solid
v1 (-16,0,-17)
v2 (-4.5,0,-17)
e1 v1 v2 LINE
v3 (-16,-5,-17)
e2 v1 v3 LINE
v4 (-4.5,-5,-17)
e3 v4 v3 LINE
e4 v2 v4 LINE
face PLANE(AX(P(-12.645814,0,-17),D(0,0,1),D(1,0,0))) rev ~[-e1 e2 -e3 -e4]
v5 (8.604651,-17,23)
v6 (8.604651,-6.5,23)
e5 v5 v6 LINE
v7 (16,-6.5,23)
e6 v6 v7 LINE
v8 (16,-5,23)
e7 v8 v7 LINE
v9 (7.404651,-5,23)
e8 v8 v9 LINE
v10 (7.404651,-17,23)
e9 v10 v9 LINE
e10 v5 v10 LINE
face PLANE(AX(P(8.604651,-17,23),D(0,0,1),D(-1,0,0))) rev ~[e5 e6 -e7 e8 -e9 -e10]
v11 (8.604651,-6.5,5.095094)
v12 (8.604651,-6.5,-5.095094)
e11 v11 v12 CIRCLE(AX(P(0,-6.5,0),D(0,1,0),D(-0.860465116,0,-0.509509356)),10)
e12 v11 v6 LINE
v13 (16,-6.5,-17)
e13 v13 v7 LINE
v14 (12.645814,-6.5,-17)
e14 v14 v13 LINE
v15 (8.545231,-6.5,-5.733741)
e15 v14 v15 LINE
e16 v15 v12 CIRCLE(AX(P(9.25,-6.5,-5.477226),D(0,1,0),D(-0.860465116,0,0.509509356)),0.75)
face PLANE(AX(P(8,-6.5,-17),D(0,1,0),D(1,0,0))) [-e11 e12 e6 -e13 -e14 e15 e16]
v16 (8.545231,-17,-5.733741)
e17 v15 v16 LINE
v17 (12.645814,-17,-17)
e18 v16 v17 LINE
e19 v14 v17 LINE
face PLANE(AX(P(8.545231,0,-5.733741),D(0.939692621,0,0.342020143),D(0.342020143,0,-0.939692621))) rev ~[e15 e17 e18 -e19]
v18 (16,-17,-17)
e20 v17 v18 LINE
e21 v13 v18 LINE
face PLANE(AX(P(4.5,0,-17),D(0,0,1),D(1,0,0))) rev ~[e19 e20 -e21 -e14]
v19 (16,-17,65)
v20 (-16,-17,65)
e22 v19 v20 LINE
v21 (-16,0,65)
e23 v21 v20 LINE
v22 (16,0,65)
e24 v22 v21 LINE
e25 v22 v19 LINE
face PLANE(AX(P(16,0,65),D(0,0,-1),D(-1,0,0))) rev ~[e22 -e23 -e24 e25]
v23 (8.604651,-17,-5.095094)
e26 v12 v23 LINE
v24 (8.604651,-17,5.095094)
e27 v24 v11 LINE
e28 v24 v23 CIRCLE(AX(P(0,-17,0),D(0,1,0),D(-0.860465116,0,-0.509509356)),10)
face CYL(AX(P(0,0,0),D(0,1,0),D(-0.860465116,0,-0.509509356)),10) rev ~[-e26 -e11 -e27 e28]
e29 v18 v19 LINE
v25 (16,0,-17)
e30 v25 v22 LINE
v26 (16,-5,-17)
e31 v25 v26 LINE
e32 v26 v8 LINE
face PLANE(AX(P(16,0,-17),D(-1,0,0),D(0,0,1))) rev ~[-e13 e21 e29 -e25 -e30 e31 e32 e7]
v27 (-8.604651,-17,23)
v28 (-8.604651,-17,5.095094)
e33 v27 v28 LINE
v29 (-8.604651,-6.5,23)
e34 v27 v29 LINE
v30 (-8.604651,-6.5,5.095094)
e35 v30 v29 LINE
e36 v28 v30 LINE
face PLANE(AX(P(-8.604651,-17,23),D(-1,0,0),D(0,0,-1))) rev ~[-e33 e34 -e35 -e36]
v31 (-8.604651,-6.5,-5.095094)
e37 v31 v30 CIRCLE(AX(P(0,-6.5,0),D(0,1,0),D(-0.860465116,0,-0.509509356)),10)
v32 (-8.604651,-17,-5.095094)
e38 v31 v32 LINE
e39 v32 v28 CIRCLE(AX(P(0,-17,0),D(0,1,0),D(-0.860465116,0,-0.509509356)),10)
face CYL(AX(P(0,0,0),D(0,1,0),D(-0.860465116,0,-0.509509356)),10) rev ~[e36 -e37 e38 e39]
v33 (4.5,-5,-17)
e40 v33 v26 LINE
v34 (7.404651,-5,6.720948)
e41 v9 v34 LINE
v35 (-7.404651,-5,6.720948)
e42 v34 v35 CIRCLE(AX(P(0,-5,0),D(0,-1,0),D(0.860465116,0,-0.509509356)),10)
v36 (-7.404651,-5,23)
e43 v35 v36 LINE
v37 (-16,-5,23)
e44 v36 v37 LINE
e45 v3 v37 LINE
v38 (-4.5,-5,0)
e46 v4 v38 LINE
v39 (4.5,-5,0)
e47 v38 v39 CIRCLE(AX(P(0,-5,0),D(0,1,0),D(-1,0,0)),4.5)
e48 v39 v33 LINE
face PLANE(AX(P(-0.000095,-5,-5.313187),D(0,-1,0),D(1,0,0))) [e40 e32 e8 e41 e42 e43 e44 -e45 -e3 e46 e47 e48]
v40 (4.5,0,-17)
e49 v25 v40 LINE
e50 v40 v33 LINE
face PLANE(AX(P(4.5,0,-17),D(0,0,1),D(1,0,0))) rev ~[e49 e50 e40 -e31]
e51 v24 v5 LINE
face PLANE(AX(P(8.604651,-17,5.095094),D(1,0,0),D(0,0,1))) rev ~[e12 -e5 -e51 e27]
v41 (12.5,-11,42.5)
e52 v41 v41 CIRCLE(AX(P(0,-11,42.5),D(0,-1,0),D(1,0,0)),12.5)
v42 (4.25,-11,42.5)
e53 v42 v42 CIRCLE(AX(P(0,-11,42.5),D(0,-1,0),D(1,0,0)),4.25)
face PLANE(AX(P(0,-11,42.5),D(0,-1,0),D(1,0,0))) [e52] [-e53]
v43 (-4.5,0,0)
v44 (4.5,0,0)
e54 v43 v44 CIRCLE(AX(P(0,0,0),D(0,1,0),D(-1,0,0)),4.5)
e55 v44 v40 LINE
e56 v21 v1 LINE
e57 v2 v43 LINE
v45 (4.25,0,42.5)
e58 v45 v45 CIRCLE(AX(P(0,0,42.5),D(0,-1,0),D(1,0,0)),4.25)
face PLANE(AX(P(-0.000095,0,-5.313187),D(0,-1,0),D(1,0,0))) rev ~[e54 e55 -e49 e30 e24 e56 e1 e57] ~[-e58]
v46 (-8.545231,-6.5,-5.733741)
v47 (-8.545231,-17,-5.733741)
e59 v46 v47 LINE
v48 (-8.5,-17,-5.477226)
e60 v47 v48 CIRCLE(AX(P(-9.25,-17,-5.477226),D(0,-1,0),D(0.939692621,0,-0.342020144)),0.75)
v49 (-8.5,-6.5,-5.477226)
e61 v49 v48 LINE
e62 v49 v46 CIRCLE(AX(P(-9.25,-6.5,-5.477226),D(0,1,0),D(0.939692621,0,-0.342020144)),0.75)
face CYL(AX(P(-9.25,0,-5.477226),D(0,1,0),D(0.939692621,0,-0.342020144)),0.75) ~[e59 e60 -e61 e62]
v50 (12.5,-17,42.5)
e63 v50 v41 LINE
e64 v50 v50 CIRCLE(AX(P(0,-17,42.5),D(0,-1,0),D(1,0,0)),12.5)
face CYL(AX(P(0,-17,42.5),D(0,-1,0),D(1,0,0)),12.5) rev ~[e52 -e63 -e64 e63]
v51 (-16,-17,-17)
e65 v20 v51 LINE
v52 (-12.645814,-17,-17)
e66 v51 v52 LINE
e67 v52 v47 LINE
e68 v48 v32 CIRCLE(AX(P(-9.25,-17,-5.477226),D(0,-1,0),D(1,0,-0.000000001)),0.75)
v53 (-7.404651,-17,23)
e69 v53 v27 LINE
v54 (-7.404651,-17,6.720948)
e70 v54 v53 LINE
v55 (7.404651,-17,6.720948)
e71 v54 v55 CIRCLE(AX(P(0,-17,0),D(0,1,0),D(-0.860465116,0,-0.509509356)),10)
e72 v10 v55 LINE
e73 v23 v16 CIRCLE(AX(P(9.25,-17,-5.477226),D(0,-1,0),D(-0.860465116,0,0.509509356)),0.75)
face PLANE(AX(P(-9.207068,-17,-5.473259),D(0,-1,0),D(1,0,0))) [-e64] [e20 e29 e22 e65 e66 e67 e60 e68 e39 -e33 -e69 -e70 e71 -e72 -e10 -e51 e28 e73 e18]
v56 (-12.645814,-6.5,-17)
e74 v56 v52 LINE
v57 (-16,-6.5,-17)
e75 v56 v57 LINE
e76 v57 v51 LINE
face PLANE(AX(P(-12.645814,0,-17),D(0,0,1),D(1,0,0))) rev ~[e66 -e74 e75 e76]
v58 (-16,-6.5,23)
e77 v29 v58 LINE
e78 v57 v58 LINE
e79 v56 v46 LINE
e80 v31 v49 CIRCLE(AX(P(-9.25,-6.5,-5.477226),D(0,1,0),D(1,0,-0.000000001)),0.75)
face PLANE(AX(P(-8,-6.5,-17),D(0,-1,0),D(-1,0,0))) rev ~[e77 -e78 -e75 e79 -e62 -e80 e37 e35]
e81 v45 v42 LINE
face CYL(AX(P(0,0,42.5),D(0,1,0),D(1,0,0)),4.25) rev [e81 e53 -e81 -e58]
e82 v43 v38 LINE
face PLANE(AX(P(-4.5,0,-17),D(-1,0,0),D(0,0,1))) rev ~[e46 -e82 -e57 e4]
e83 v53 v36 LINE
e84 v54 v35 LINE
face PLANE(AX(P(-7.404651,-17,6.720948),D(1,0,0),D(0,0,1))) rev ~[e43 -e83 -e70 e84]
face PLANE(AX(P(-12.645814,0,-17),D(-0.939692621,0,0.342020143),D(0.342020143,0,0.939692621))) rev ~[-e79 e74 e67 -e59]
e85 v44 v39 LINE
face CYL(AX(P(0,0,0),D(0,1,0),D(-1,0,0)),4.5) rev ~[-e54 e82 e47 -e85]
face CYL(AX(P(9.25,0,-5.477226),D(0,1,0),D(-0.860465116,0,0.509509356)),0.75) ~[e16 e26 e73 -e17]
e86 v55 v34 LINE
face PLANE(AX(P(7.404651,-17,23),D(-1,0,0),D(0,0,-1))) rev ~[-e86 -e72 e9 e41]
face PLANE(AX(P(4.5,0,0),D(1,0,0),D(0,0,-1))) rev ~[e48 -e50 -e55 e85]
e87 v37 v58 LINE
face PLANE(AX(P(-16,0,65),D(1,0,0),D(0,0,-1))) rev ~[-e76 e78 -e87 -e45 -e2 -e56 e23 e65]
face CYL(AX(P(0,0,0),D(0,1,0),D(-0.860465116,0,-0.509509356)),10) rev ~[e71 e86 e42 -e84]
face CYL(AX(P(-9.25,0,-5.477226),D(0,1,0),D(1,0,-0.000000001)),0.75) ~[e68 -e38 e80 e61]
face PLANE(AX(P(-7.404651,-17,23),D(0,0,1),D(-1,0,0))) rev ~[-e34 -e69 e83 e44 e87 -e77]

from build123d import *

# Parameters (mm, degrees)
F0_R     = 4.25
F1_DEPTH = 17
F2_DEPTH = 5
F4_DEPTH = 12
F5_W     = 4.6458135775
F5_H     = 1.5
F5_W_2   = 3.3541864225
F5_W_3   = 8
F6_DEPTH = 40
F7_R     = 12.5
F7_R_2   = 4.25
F8_DEPTH = 6


# Not quite as in the source:
# - a feature names something its author has since deleted; it is built from what else it names


with BuildPart() as f1:
    # F0 (on Front) → F1 (new body)
    with BuildSketch(Plane.XZ):
        with BuildLine():
            ThreePointArc((-8.5, -5.4772255751), (-8.5266357667, -5.2791241211), (-8.6046511628, -5.0950935582))
            ThreePointArc((-8.6046511628, -5.0950935582), (-9.9967746616, -5.5467065419), (-8.5452305344, -5.7337406825))
            ThreePointArc((-8.5452305344, -5.7337406825), (-8.5113941852, -5.6074617083), (-8.5, -5.4772255751))
        make_face()
        with BuildLine():
            ThreePointArc((-8.6046511628, -5.0950935582), (0, 10), (8.6046511628, -5.0950935582))
            ThreePointArc((8.6046511628, -5.0950935582), (9.4481014539, -4.7538613418), (10, -5.4772255751))
            ThreePointArc((10, -5.4772255751), (9.3802361333, -6.2158313898), (8.5452305344, -5.7337406825))
            Line((8.5452305344, -5.7337406825), (12.6458135775, -17))
            Line((12.6458135775, -17), (16, -17))
            Line((16, -17), (16, 65))
            Line((16, 65), (-16, 65))
            Line((-16, 65), (-16, -17))
            Line((-16, -17), (-12.6458135775, -17))
            Line((-12.6458135775, -17), (-8.5452305344, -5.7337406825))
            ThreePointArc((-8.5452305344, -5.7337406825), (-9.9967746616, -5.5467065419), (-8.6046511628, -5.0950935582))
        make_face()
        with Locations((0, 42.5)):
            Circle(F0_R, mode=Mode.SUBTRACT)
        with BuildLine():
            ThreePointArc((10, -5.4772255751), (9.4481014539, -4.7538613418), (8.6046511628, -5.0950935582))
            ThreePointArc((8.6046511628, -5.0950935582), (8.5032253384, -5.4077446082), (8.5452305344, -5.7337406825))
            ThreePointArc((8.5452305344, -5.7337406825), (9.3802361333, -6.2158313898), (10, -5.4772255751))
        make_face()
    extrude(amount=F1_DEPTH)

    # F0 (on Front) → F2 (join)
    with BuildSketch(Plane.XZ):
        with BuildLine():
            ThreePointArc((8.5452305344, -5.7337406825), (8.5032253384, -5.4077446082), (8.6046511628, -5.0950935582))
            ThreePointArc((8.6046511628, -5.0950935582), (0, 10), (-8.6046511628, -5.0950935582))
            ThreePointArc((-8.6046511628, -5.0950935582), (-8.5266357667, -5.2791241211), (-8.5, -5.4772255751))
            ThreePointArc((-8.5, -5.4772255751), (-8.5113941852, -5.6074617083), (-8.5452305344, -5.7337406825))
            Line((-8.5452305344, -5.7337406825), (-12.6458135775, -17))
            Line((-12.6458135775, -17), (-4.5, -17))
            Line((-4.5, -17), (-4.5, 0))
            ThreePointArc((-4.5, 0), (0, 4.5), (4.5, 0))
            Line((4.5, 0), (4.5, -17))
            Line((4.5, -17), (12.6458135775, -17))
            Line((12.6458135775, -17), (8.5452305344, -5.7337406825))
        make_face()
    extrude(amount=F2_DEPTH)

    # F3 (on face) → F4 (cut)
    with BuildSketch(Plane.XZ.offset(17)):
        with BuildLine():
            Line((-8.6046511628, 23), (-8.6046511628, 5.0950935582))
            ThreePointArc((-8.6046511628, 5.0950935582), (-8.0458244358, 5.938409648), (-7.4046511628, 6.7209479359))
            Line((-7.4046511628, 6.7209479359), (-7.4046511628, 23))
            Line((-7.4046511628, 23), (-8.6046511628, 23))
        make_face()
        with BuildLine():
            Line((7.4046511628, 23), (7.4046511628, 6.7209479359))
            ThreePointArc((7.4046511628, 6.7209479359), (8.0458244358, 5.938409648), (8.6046511628, 5.0950935582))
            Line((8.6046511628, 5.0950935582), (8.6046511628, 23))
            Line((8.6046511628, 23), (7.4046511628, 23))
        make_face()
    extrude(amount=-F4_DEPTH, mode=Mode.SUBTRACT)

    # F5 (on face) → F6 (cut)
    with BuildSketch(Plane(origin=(0, 0, -17), x_dir=(1, 0, 0), z_dir=(0, 0, -1))):
        with Locations((-10.3229067887, 5.75)):
            Rectangle(F5_W, F5_H)
        with Locations((-14.3229067887, 5.75)):
            Rectangle(F5_W_2, F5_H)
        with Locations((12, 5.75)):
            Rectangle(F5_W_3, F5_H)
    extrude(amount=-F6_DEPTH, mode=Mode.SUBTRACT)

    # F7 (on face) → F8 (cut)
    with BuildSketch(Plane.XZ.offset(17)):
        with Locations((0, 42.5)):
            Circle(F7_R)
        with Locations((0, 42.5)):
            Circle(F7_R_2, mode=Mode.SUBTRACT)
    extrude(amount=-F8_DEPTH, mode=Mode.SUBTRACT)


solid = f1.part
